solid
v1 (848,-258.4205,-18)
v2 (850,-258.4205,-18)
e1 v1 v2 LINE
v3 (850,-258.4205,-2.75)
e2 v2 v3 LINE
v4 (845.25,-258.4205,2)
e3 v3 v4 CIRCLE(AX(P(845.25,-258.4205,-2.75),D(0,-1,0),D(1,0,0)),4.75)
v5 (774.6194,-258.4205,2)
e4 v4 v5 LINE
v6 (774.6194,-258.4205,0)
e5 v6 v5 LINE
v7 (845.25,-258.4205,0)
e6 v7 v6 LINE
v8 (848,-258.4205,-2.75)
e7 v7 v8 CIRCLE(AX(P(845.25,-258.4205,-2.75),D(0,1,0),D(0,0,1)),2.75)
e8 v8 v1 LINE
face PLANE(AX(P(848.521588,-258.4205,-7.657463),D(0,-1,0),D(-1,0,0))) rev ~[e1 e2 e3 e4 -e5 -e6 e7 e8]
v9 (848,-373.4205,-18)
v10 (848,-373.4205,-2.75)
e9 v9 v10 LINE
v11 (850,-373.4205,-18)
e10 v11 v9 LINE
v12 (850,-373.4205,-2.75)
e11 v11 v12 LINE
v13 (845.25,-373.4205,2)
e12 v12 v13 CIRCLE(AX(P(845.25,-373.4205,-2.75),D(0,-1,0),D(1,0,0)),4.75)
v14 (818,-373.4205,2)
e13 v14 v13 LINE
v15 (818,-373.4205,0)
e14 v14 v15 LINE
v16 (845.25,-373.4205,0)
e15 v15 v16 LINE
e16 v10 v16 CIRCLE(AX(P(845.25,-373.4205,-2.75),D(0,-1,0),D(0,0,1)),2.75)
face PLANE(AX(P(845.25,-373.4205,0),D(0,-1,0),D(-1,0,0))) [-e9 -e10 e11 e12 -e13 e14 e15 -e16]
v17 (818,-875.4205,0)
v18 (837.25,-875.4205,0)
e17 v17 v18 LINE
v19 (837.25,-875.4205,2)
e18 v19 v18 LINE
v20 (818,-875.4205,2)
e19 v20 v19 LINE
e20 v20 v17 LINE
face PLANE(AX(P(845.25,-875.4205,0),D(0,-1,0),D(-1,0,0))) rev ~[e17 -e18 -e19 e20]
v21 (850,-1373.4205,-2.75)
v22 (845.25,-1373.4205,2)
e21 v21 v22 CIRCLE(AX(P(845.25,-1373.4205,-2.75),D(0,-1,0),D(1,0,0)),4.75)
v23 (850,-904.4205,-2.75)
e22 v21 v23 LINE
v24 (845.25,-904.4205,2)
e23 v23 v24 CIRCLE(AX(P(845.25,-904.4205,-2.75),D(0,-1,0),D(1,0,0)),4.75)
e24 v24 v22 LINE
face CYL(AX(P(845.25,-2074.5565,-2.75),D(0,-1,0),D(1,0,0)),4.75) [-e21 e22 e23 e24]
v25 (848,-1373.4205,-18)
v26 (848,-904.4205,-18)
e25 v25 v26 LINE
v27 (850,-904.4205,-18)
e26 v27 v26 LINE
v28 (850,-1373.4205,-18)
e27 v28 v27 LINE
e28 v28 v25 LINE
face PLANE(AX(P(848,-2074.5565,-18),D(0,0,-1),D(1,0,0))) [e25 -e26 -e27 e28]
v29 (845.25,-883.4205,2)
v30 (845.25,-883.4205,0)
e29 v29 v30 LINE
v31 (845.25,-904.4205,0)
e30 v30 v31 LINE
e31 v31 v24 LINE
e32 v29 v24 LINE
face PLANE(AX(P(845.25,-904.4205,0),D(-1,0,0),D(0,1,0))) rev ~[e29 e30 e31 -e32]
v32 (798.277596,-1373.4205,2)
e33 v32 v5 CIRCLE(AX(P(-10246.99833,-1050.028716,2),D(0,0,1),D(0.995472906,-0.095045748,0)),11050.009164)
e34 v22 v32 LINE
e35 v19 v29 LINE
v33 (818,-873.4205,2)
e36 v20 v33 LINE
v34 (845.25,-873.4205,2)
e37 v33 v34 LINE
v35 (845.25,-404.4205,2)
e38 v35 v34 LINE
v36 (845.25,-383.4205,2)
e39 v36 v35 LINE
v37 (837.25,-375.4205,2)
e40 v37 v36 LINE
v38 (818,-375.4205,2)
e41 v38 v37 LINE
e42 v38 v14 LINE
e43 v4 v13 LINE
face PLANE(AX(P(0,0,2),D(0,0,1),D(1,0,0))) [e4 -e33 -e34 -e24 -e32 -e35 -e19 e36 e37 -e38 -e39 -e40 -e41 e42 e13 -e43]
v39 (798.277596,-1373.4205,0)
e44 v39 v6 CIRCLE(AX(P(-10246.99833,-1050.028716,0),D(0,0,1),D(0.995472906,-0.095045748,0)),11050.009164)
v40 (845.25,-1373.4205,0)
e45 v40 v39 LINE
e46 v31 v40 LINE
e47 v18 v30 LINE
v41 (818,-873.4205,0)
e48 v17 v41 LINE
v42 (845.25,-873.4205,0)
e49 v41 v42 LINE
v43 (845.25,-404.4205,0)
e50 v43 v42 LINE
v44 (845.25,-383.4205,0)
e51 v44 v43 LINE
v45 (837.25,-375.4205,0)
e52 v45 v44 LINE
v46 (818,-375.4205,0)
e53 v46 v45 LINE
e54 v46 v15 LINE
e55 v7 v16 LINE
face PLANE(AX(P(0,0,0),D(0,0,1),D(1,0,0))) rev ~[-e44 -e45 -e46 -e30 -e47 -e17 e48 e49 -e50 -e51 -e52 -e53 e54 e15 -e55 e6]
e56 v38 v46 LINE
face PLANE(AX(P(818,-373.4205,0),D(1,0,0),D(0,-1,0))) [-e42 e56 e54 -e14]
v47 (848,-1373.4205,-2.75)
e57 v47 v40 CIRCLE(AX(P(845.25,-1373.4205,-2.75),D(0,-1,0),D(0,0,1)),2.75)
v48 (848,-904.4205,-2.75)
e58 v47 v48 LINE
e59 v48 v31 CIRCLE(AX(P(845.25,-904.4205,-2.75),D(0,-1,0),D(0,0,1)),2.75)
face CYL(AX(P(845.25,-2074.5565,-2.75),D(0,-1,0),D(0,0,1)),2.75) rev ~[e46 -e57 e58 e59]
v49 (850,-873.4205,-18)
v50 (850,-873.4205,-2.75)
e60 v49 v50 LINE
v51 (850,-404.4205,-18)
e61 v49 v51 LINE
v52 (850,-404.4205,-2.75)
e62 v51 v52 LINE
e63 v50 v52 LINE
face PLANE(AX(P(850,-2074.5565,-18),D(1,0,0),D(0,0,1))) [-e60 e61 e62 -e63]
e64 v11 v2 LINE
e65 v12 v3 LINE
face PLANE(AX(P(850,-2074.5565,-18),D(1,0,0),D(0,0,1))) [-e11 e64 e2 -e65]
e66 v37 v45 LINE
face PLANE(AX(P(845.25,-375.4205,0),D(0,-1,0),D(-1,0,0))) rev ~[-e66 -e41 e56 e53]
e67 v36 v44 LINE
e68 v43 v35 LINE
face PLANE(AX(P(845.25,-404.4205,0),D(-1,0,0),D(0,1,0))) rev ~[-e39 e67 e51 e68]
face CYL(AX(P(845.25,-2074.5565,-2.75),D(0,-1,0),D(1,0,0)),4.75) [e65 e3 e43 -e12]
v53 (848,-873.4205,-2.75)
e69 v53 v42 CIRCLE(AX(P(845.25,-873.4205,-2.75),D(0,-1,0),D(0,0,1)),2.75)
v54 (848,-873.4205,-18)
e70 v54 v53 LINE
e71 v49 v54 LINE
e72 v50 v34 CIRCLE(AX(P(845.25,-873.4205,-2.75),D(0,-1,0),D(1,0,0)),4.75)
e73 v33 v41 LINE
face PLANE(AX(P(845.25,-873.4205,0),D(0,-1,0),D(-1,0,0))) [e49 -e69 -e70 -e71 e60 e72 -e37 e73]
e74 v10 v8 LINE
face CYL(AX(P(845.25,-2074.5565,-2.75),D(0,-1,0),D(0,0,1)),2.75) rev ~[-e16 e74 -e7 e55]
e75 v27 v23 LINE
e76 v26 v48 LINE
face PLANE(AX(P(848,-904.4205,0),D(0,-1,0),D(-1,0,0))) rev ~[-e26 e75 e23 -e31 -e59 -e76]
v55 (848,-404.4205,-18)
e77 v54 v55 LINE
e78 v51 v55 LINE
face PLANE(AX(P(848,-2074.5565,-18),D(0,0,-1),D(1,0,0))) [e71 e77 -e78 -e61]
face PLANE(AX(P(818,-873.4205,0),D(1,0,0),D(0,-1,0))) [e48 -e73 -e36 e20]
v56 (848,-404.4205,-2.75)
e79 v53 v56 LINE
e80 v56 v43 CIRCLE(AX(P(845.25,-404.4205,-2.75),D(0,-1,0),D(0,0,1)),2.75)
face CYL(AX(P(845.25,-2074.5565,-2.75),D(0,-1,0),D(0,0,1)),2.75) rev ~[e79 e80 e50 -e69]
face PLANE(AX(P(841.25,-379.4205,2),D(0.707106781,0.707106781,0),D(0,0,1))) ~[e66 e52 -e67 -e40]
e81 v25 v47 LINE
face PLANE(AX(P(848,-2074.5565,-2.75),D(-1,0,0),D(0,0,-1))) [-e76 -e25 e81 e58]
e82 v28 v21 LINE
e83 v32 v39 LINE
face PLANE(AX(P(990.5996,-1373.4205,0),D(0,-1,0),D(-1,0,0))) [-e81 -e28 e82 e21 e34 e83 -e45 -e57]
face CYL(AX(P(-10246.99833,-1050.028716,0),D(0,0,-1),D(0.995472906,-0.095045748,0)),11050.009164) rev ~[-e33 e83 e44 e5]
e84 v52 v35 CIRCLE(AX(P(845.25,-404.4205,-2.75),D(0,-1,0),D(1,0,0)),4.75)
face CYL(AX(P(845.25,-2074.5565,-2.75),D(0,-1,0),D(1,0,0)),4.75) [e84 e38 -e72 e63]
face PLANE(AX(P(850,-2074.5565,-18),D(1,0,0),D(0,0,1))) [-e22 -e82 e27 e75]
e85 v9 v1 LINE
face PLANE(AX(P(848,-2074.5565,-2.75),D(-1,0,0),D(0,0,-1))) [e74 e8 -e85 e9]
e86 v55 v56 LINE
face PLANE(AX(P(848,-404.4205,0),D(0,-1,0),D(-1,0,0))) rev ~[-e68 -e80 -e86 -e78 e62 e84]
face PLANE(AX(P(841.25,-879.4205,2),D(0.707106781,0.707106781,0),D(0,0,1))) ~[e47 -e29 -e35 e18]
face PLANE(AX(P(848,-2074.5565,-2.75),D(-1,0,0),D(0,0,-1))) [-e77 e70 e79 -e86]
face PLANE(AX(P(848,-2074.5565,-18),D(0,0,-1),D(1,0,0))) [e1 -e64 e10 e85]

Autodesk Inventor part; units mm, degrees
ref_plane "YZ Plane" through (0, 0, 0) normal (1, 0, 0) x (0, 1, 0)
ref_plane "XZ Plane" through (0, 0, 0) normal (0, 1, 0) x (-1, 0, 0)
ref_plane "XY Plane" through (0, 0, 0) normal (0, 0, 1) x (1, 0, 0)
sketch "Sketch1" plane through (0, 0, 0) normal (0, 0, 1) x (1, 0, 0)
  arc A0 (750, -2100) -> (770.156, -238.4205) centre (-10250, -1050) ccw construction
  arc A1 (752.9864, -2100.2851) -> (771.2831, -213.263) centre (-10246.9891, -1050.0292) ccw
  line L0 (-750, -2700) -> (-750, 0) construction
  line L1 (-800, 50) -> (-800, -2750) construction
  line L2 (-850, -2800) -> (-850, 100) construction
  line L3 (850, 100) -> (850, -2800)
  line L4 (800, -2750) -> (800, 50) construction
  line L5 (750, 0) -> (750, -2700) construction
  line L6 (770.156, -238.4205) -> (767.1641, -238.6409) construction
  line L7 (768.2917, -213.4901) -> (771.2831, -213.263) construction
  arc A2 (747.4657, -5.0326) -> (744.8748, -2.3426) centre (744.4792, -5.3164) ccw construction
  arc A3 (747.4657, -5.0326) -> (747.0136, -0.2851) centre (-10252.9895, -1050.2527) ccw construction
  arc A4 (767.1641, -238.6409) -> (747.4657, -5.0326) centre (-10252.9895, -1050.2527) ccw construction
  line L8 (750, 0) -> (747.0136, -0.2851) construction
  arc A5 (750.4522, -4.7486) -> (750, 0) centre (-10250, -1050) ccw construction
  arc A6 (750.4522, -4.7486) -> (745.2706, 0.6314) centre (744.4791, -5.3162) ccw
  line L9 (-750, 0) -> (750, 0) construction
  line L10 (-850, 100) -> (850, 100) construction
  line L11 (800, 50) -> (-800, 50) construction
  arc A7 (770.156, -238.4205) -> (750.4522, -4.7486) centre (-10250, -1050) ccw
  line L12 (750, -2700) -> (-750, -2700) construction
  line L13 (750, -2100) -> (752.9864, -2100.2851) construction
  line L14 (-800, -2750) -> (800, -2750)
  line L15 (850, -2800) -> (-850, -2800) construction
  arc A8 (110, -2700) -> (114.1118, -2698.3696) centre (110, -2694) ccw construction
  line L16 (0, -2697) -> (110, -2697) construction
  line L17 (0, -2700) -> (0, -2697) construction
  arc A9 (750, 0) -> (745.2706, 0.6314) centre (0, -5600) ccw construction
  line L18 (750, 0) -> (749.6018, -2.9735) construction
  arc A10 (750, -3.0268) -> (0, 47) centre (-0.2, -5603) ccw construction
  line L19 (0, 47) -> (0, 0) construction
  line L20 (0, 50) -> (0, 47) construction
  line L21 (0, 100) -> (0, 50)
  arc A11 (745.2706, 0.6314) -> (0, 50) centre (0, -5600) ccw construction
  line L22 (-750, -2100) -> (750, -2100) construction
  arc A12 (110, -2697) -> (112.0559, -2696.1848) centre (110, -2694) ccw construction
  line L23 (676.3163, -2173.4556) -> (674.2605, -2171.2708) construction
  line L24 (690.4112, -2151.9536) -> (692.4671, -2154.1384) construction
  line L25 (752.0559, -2102.1848) -> (676.3163, -2173.4556) construction
  line L26 (114.1118, -2698.3696) -> (750, -2100) construction
  arc A13 (752.0559, -2102.1848) -> (752.9864, -2100.2851) centre (749.9998, -2099.9999) ccw construction
  line L27 (750, -2100) -> (752.0559, -2102.1848) construction
  arc A14 (749.1768, -2100.7746) -> (750.1074, -2098.8746) centre (747.1209, -2098.5898) ccw construction
  line L28 (112.0559, -2696.1848) -> (690.4112, -2151.9536) construction
  line L29 (850, -258.4205) -> (774.6194, -258.4205)
  arc A15 (800, 50) -> (0, 100) centre (0, -6325) ccw construction
  arc A16 (824.6194, -258.4205) -> (800, 50) centre (-10711.2413, -1024.069) ccw construction
  line L30 (824.6194, -258.4205) -> (824.6194, 100) construction
  arc A17 (789.8132, -2131.1922) -> (824.6194, -258.4205) centre (-10201.1223, -990.2118) ccw construction
  line L31 (0, -2700) -> (0, -2750) construction
  line L32 (112.3791, -2700) -> (132.2053, -2750) construction
  line L33 (132.2053, -2750) -> (850, -2074.5565)
  arc A18 (770.0996, -238.4247) -> (766.3709, -188.564) centre (768.2917, -213.4901) ccw construction
  line L34 (850, -400) -> (783.8749, -400) construction
  line L35 (850, -900) -> (801.9923, -900) construction
  line L36 (850, -1400) -> (797.4674, -1400) construction
  line L37 (850, -1900) -> (770.2723, -1900) construction
  line L38 (350, 100) -> (350, 39.1489)
  line L39 (-1472.612, -150) -> (-973.4947, -150)
  line L40 (-1472.612, -700) -> (-973.4947, -700)
  line L41 (-1472.612, -1250) -> (-973.4947, -1250)
  line L42 (-1472.612, -1800) -> (-973.4947, -1800)
  line L43 (800, -2750) -> (850, -2750) construction
  line L44 (753.1643, -2098.4205) -> (850, -2098.4205)
  point P0 (824.6397, -2098.4205)
  dimension "d16" = 1500
  dimension "d17" = 2700
  dimension "d18" = 2100
  dimension "d19" = 6
  dimension "d20" = 3
  dimension "d21" = 3
  dimension "d22" = 6
  dimension "d23" = 3
  dimension "d24" = 239.271
  dimension "d25" = 50
  dimension "d26" = 50
  dimension "d27" = 3
  dimension "d28" = 110
  dimension "d29" = 25
  dimension "d30" = 104
  dimension "d31" = 25
  dimension "d32" = 20
  dimension "d33" = 50
  dimension "d57" = 500
  dimension "d58" = 500
  dimension "d59" = 500
  dimension "d60" = 500
  dimension "d61" = 500
  dimension "d83" = 250
  dimension "d86" = 550
  dimension "d91" = 274.5565
  dimension "d103" = 1.873
  dimension "d116" = 1840
extrude "Plate3" add sketch "Sketch1" along normal blind 2 contours A1 L29 L3 L33 L44
sketch "Sketch3" plane through (848, -258.4205, 2) normal (1, 0, 0) x (0, 1, 0)
  line L0 (-1816.136, 0) -> (0, 0)
  line L1 (0, 0) -> (0, 20)
  line L2 (0, 20) -> (-1816.136, 20)
  line L3 (-1816.136, 20) -> (-1816.136, 0)
edge flange "Flange2" height 20 angle 90 thickness 2 bend radius 2.75 thickness toward (1, 0, 0) relief tear relief width 2 relief depth 1 edges at (850, -1166.4885, 2) wall of the first edge with corners at (848, -2074.5565, 2) (848, -258.4205, 2) (848, -258.4205, -18) (848, -2074.5565, -18)
bend "Bend2"
corner "Corner2"
sketch "Sketch5" plane through (0, 0, 0) normal (0, 0, 1) x (1, 0, 0)
  line L0 (845.25, -2079.0263) -> (845.25, -258.4205) projected
  line L1 (774.6194, -258.4205) -> (845.25, -258.4205) projected
  arc A0 (753.1643, -2098.4205) -> (774.6194, -258.4205) centre (-10246.9891, -1050.0292) ccw projected
  line L2 (850, -258.4205) -> (850, -2074.5565) projected
  line L3 (850, -373.4205) -> (818, -373.4205)
  line L4 (850, -375.4205) -> (848, -375.4205) construction
  line L5 (848, -2074.5565) -> (848, -258.4205) projected
  line L6 (818, -373.4205) -> (818, -375.4205)
  line L7 (850, -873.4195) -> (801.5994, -873.4195) construction
  line L8 (850, -875.4195) -> (801.6312, -875.4195) construction
  line L9 (819, -873.4195) -> (819, -875.4195) construction
  line L10 (850, -1373.4195) -> (798.2777, -1373.4195) construction
  line L11 (850, -1375.4195) -> (798.2189, -1375.4195) construction
  line L12 (819, -1373.4195) -> (819, -1375.4195) construction
  line L13 (850, -1873.4195) -> (772.2907, -1873.4195) construction
  line L14 (850, -1875.4195) -> (772.1411, -1875.4195) construction
  line L15 (819, -1873.4195) -> (819, -1875.4195) construction
  line L16 (850, -904.4195) -> (845.25, -904.4195) construction
  line L17 (845.25, -1404.4195) -> (850, -1404.4195) construction
  line L18 (845.25, -1904.4195) -> (850, -1904.4195) construction
  line L19 (824.6397, -2098.4205) -> (753.1643, -2098.4205) projected
  line L20 (850, -373.4205) -> (850, -404.4205)
  line L21 (848, -373.4205) -> (848, -375.4205) construction
  line L22 (850, -404.4205) -> (848, -404.4205)
  line L23 (818, -373.4205) -> (782.2765, -373.4205) construction
  line L24 (818, -375.4205) -> (782.399, -375.4205) construction
  line L25 (848, -375.4205) -> (848, -404.4205)
  line L26 (848, -375.4205) -> (818, -375.4205)
  line L27 (848, -404.4205) -> (845.25, -404.4205)
  line L28 (845.25, -2079.0263) -> (824.6397, -2098.4205) projected
  point P0 (0, 0)
  point P1 (845.25, -380.4205)
  point P2 (848, -380.4205)
  point P3 (848, -1904.4195)
  point P4 (848, -1875.4195)
  point P5 (848, -1404.4195)
  point P6 (848, -1375.4195)
  point P7 (848, -904.4195)
  point P8 (848, -875.4195)
  point P9 (818, -374.4205)
  point P10 (848, -404.4205)
  point P11 (850, -410.4205)
  point P12 (848, -373.4205)
  point P13 (819, -874.4195)
  point P14 (819, -1374.4195)
  point P15 (819, -1874.4195)
  point P16 (848, -404.4205)
  point P17 (845.25, -375.4205)
  dimension "d69" = 1816.136
  dimension "d70" = 2
  dimension "d76" = 67.7235
  dimension "d80" = 48.4006
  dimension "d81" = 31
  dimension "d94" = 31
  dimension "d95" = 31
  dimension "d96" = 31
  dimension "d97" = 31
  dimension "d98" = 31
  dimension "d102" = 77.7093
  dimension "d104" = 51.7223
  dimension "d106" = 2
  dimension "d107" = 31
  dimension "d108" = 116
  dimension "d109" = 500
  dimension "d110" = 500
  dimension "d111" = 500
  dimension "d112" = 32
extrude "Extrusion2" cut sketch "Sketch5" along normal through all both and the other way through all contours L0 L26 L5 L27 | L26 L6 L3 L0 | L0 L3 L5 L26 | L5 L3 L2 L22
chamfer "Chamfer2" distance 8 angle 45 1 edges at (845.25, -375.4205, 1)
pattern_linear "Rectangular Pattern3" count 4 spacing 500 along (0, -1, 0) of "Extrusion2", "Chamfer2"
sketch "Sketch6" plane through (0, 0, 0) normal (0, 0, -1) x (-1, 0, 0)
  line L0 (-803.1643, -2093.4205) -> (-815.1643, -2093.4205) construction
  line L1 (-815.1643, -2093.4205) -> (-815.1643, -1893.4205) construction
  line L2 (-815.1643, -1893.4205) -> (-803.1643, -1893.4205) construction
  line L3 (-803.1643, -1893.4205) -> (-803.1643, -2093.4205) construction
  line L4 (-753.1643, -2098.4205) -> (-824.6397, -2098.4205) projected
  line L5 (-803.1643, -1798.4205) -> (-803.1643, -1848.4205) construction
  line L6 (-803.1643, -1848.4205) -> (-815.1643, -1848.4205) construction
  line L7 (-815.1643, -1848.4205) -> (-815.1643, -1798.4205) construction
  line L8 (-815.1643, -1798.4205) -> (-803.1643, -1798.4205) construction
  line L9 (-845.25, -1873.4205) -> (-818, -1873.4205) projected
  line L10 (-803.1643, -1298.4205) -> (-803.1643, -1348.4205) construction
  line L11 (-803.1643, -1348.4205) -> (-815.1643, -1348.4205) construction
  line L12 (-815.1643, -1348.4205) -> (-815.1643, -1298.4205) construction
  line L13 (-815.1643, -1298.4205) -> (-803.1643, -1298.4205) construction
  line L14 (-803.1643, -798.4205) -> (-803.1643, -848.4205) construction
  line L15 (-803.1643, -848.4205) -> (-815.1643, -848.4205) construction
  line L16 (-815.1643, -848.4205) -> (-815.1643, -798.4205) construction
  line L17 (-815.1643, -798.4205) -> (-803.1643, -798.4205) construction
  line L18 (-803.1643, -298.4205) -> (-803.1643, -348.4205) construction
  line L19 (-803.1643, -348.4205) -> (-815.1643, -348.4205) construction
  line L20 (-815.1643, -348.4205) -> (-815.1643, -298.4205) construction
  line L21 (-815.1643, -298.4205) -> (-803.1643, -298.4205) construction
  line L22 (-845.25, -1373.4205) -> (-818, -1373.4205) projected
  line L23 (-845.25, -873.4205) -> (-818, -873.4205) projected
  line L24 (-845.25, -373.4205) -> (-818, -373.4205) projected
  point P0 (0, 0)
  dimension "d120" = 200
  dimension "d121" = 12
  dimension "d123" = 5
  dimension "d124" = 50
  dimension "d125" = 12
  dimension "d126" = 50
  dimension "d127" = 25
  dimension "d128" = 50
  dimension "d129" = 12
  dimension "d130" = 50
  dimension "d131" = 12
  dimension "d132" = 50
  dimension "d133" = 12
  dimension "d134" = 50
  dimension "d135" = 25
  dimension "d136" = 25
  dimension "d137" = 25
  dimension "d138" = 50
  dimension "d139" = 50
  dimension "d140" = 50
mark "Mark1"
sketch "Sketch7" plane through (0, 0, 0) normal (0, 0, 1) x (1, 0, 0)
  line L0 (837.25, -1875.4205) -> (845.25, -1883.4205) construction
  line L1 (837.25, -1875.4205) -> (818, -1875.4205) construction
  line L2 (818, -1875.4205) -> (818, -1873.4205) construction
  line L3 (818, -1873.4205) -> (845.25, -1873.4205) construction
  line L4 (845.25, -1873.4205) -> (845.25, -1404.4205) construction
  line L5 (845.25, -1404.4205) -> (845.25, -1383.4205) construction
  line L6 (837.25, -1375.4205) -> (845.25, -1383.4205) construction
  line L7 (837.25, -1375.4205) -> (818, -1375.4205) construction
  line L8 (818, -1375.4205) -> (818, -1373.4205) construction
  line L9 (818, -1373.4205) -> (845.25, -1373.4205) construction
  line L10 (845.25, -1373.4205) -> (845.25, -904.4205) construction
  line L11 (845.25, -904.4205) -> (845.25, -883.4205) construction
  line L12 (837.25, -875.4205) -> (845.25, -883.4205) construction
  line L13 (837.25, -875.4205) -> (818, -875.4205) construction
  line L14 (818, -875.4205) -> (818, -873.4205) construction
  line L15 (818, -873.4205) -> (845.25, -873.4205) construction
  line L16 (845.25, -873.4205) -> (845.25, -404.4205) construction
  line L17 (845.25, -404.4205) -> (845.25, -383.4205) projected
  line L18 (837.25, -375.4205) -> (845.25, -383.4205) projected
  line L19 (837.25, -375.4205) -> (818, -375.4205) projected
  line L20 (818, -375.4205) -> (818, -373.4205) projected
  line L21 (818, -373.4205) -> (845.25, -373.4205) projected
  line L22 (845.25, -373.4205) -> (845.25, -258.4205) projected
  line L23 (774.6194, -258.4205) -> (845.25, -258.4205) projected
  arc A0 (753.1643, -2098.4205) -> (774.6194, -258.4205) centre (-10246.9891, -1050.0292) ccw construction
  line L24 (824.6397, -2098.4205) -> (753.1643, -2098.4205) construction
  line L25 (845.25, -2079.0263) -> (824.6397, -2098.4205) construction
  line L26 (845.25, -2079.0263) -> (845.25, -1904.4205) construction
  line L27 (845.25, -1904.4205) -> (845.25, -1883.4205) construction
  line L28 (716.6808, -2129.5736) -> (990.5996, -2129.5736)
  line L29 (990.5996, -2129.5736) -> (990.5996, -1373.4205)
  line L30 (990.5996, -1373.4205) -> (716.6808, -1373.4205)
  line L31 (716.6808, -1373.4205) -> (716.6808, -2129.5736)
  point P0 (0, 0)
extrude "Extrusion3" cut sketch "Sketch7" along normal through all both and the other way through all
equation "\"d16\" = d34"
equation "\"d17\" = d35"
equation "\"d18\" = d36"
equation "\"d19\" = d37"
equation "\"d20\" = d38"
equation "\"d21\" = d39"
equation "\"d22\" = d39 + d43"
equation "\"d23\" = d39"
equation "\"d24\" = d40"
equation "\"d27\" = d39"
equation "\"d28\" = 0.5 * d44"
equation "\"d29\" = d41"
equation "\"d30\" = d42"
equation "\"d31\" = d41"
equation "\"d33\" = d25"
equation "\"Стрингер_3\" = 67.5235"
equation "\"d37\" = d39 + d43"
equation "\"d38\" = d39"
equation "\"d43\" = d39"
equation "\"Стрингер_4\" = 48.20059"
equation "\"Стрингер_5\" = 51.52235"
equation "\"Стрингер_6\" = 77.5093"
equation "\"d34\" = 1500"
equation "\"d35\" = 2700"
equation "\"d36\" = 2100"
equation "\"d39\" = 3"
equation "\"d40\" = 239.271"
equation "\"d44\" = 220"
equation "\"d41\" = 25"
equation "\"d42\" = 104"
properties part number "MSC 052 rib board_CPY" material "Stainless Steel"
